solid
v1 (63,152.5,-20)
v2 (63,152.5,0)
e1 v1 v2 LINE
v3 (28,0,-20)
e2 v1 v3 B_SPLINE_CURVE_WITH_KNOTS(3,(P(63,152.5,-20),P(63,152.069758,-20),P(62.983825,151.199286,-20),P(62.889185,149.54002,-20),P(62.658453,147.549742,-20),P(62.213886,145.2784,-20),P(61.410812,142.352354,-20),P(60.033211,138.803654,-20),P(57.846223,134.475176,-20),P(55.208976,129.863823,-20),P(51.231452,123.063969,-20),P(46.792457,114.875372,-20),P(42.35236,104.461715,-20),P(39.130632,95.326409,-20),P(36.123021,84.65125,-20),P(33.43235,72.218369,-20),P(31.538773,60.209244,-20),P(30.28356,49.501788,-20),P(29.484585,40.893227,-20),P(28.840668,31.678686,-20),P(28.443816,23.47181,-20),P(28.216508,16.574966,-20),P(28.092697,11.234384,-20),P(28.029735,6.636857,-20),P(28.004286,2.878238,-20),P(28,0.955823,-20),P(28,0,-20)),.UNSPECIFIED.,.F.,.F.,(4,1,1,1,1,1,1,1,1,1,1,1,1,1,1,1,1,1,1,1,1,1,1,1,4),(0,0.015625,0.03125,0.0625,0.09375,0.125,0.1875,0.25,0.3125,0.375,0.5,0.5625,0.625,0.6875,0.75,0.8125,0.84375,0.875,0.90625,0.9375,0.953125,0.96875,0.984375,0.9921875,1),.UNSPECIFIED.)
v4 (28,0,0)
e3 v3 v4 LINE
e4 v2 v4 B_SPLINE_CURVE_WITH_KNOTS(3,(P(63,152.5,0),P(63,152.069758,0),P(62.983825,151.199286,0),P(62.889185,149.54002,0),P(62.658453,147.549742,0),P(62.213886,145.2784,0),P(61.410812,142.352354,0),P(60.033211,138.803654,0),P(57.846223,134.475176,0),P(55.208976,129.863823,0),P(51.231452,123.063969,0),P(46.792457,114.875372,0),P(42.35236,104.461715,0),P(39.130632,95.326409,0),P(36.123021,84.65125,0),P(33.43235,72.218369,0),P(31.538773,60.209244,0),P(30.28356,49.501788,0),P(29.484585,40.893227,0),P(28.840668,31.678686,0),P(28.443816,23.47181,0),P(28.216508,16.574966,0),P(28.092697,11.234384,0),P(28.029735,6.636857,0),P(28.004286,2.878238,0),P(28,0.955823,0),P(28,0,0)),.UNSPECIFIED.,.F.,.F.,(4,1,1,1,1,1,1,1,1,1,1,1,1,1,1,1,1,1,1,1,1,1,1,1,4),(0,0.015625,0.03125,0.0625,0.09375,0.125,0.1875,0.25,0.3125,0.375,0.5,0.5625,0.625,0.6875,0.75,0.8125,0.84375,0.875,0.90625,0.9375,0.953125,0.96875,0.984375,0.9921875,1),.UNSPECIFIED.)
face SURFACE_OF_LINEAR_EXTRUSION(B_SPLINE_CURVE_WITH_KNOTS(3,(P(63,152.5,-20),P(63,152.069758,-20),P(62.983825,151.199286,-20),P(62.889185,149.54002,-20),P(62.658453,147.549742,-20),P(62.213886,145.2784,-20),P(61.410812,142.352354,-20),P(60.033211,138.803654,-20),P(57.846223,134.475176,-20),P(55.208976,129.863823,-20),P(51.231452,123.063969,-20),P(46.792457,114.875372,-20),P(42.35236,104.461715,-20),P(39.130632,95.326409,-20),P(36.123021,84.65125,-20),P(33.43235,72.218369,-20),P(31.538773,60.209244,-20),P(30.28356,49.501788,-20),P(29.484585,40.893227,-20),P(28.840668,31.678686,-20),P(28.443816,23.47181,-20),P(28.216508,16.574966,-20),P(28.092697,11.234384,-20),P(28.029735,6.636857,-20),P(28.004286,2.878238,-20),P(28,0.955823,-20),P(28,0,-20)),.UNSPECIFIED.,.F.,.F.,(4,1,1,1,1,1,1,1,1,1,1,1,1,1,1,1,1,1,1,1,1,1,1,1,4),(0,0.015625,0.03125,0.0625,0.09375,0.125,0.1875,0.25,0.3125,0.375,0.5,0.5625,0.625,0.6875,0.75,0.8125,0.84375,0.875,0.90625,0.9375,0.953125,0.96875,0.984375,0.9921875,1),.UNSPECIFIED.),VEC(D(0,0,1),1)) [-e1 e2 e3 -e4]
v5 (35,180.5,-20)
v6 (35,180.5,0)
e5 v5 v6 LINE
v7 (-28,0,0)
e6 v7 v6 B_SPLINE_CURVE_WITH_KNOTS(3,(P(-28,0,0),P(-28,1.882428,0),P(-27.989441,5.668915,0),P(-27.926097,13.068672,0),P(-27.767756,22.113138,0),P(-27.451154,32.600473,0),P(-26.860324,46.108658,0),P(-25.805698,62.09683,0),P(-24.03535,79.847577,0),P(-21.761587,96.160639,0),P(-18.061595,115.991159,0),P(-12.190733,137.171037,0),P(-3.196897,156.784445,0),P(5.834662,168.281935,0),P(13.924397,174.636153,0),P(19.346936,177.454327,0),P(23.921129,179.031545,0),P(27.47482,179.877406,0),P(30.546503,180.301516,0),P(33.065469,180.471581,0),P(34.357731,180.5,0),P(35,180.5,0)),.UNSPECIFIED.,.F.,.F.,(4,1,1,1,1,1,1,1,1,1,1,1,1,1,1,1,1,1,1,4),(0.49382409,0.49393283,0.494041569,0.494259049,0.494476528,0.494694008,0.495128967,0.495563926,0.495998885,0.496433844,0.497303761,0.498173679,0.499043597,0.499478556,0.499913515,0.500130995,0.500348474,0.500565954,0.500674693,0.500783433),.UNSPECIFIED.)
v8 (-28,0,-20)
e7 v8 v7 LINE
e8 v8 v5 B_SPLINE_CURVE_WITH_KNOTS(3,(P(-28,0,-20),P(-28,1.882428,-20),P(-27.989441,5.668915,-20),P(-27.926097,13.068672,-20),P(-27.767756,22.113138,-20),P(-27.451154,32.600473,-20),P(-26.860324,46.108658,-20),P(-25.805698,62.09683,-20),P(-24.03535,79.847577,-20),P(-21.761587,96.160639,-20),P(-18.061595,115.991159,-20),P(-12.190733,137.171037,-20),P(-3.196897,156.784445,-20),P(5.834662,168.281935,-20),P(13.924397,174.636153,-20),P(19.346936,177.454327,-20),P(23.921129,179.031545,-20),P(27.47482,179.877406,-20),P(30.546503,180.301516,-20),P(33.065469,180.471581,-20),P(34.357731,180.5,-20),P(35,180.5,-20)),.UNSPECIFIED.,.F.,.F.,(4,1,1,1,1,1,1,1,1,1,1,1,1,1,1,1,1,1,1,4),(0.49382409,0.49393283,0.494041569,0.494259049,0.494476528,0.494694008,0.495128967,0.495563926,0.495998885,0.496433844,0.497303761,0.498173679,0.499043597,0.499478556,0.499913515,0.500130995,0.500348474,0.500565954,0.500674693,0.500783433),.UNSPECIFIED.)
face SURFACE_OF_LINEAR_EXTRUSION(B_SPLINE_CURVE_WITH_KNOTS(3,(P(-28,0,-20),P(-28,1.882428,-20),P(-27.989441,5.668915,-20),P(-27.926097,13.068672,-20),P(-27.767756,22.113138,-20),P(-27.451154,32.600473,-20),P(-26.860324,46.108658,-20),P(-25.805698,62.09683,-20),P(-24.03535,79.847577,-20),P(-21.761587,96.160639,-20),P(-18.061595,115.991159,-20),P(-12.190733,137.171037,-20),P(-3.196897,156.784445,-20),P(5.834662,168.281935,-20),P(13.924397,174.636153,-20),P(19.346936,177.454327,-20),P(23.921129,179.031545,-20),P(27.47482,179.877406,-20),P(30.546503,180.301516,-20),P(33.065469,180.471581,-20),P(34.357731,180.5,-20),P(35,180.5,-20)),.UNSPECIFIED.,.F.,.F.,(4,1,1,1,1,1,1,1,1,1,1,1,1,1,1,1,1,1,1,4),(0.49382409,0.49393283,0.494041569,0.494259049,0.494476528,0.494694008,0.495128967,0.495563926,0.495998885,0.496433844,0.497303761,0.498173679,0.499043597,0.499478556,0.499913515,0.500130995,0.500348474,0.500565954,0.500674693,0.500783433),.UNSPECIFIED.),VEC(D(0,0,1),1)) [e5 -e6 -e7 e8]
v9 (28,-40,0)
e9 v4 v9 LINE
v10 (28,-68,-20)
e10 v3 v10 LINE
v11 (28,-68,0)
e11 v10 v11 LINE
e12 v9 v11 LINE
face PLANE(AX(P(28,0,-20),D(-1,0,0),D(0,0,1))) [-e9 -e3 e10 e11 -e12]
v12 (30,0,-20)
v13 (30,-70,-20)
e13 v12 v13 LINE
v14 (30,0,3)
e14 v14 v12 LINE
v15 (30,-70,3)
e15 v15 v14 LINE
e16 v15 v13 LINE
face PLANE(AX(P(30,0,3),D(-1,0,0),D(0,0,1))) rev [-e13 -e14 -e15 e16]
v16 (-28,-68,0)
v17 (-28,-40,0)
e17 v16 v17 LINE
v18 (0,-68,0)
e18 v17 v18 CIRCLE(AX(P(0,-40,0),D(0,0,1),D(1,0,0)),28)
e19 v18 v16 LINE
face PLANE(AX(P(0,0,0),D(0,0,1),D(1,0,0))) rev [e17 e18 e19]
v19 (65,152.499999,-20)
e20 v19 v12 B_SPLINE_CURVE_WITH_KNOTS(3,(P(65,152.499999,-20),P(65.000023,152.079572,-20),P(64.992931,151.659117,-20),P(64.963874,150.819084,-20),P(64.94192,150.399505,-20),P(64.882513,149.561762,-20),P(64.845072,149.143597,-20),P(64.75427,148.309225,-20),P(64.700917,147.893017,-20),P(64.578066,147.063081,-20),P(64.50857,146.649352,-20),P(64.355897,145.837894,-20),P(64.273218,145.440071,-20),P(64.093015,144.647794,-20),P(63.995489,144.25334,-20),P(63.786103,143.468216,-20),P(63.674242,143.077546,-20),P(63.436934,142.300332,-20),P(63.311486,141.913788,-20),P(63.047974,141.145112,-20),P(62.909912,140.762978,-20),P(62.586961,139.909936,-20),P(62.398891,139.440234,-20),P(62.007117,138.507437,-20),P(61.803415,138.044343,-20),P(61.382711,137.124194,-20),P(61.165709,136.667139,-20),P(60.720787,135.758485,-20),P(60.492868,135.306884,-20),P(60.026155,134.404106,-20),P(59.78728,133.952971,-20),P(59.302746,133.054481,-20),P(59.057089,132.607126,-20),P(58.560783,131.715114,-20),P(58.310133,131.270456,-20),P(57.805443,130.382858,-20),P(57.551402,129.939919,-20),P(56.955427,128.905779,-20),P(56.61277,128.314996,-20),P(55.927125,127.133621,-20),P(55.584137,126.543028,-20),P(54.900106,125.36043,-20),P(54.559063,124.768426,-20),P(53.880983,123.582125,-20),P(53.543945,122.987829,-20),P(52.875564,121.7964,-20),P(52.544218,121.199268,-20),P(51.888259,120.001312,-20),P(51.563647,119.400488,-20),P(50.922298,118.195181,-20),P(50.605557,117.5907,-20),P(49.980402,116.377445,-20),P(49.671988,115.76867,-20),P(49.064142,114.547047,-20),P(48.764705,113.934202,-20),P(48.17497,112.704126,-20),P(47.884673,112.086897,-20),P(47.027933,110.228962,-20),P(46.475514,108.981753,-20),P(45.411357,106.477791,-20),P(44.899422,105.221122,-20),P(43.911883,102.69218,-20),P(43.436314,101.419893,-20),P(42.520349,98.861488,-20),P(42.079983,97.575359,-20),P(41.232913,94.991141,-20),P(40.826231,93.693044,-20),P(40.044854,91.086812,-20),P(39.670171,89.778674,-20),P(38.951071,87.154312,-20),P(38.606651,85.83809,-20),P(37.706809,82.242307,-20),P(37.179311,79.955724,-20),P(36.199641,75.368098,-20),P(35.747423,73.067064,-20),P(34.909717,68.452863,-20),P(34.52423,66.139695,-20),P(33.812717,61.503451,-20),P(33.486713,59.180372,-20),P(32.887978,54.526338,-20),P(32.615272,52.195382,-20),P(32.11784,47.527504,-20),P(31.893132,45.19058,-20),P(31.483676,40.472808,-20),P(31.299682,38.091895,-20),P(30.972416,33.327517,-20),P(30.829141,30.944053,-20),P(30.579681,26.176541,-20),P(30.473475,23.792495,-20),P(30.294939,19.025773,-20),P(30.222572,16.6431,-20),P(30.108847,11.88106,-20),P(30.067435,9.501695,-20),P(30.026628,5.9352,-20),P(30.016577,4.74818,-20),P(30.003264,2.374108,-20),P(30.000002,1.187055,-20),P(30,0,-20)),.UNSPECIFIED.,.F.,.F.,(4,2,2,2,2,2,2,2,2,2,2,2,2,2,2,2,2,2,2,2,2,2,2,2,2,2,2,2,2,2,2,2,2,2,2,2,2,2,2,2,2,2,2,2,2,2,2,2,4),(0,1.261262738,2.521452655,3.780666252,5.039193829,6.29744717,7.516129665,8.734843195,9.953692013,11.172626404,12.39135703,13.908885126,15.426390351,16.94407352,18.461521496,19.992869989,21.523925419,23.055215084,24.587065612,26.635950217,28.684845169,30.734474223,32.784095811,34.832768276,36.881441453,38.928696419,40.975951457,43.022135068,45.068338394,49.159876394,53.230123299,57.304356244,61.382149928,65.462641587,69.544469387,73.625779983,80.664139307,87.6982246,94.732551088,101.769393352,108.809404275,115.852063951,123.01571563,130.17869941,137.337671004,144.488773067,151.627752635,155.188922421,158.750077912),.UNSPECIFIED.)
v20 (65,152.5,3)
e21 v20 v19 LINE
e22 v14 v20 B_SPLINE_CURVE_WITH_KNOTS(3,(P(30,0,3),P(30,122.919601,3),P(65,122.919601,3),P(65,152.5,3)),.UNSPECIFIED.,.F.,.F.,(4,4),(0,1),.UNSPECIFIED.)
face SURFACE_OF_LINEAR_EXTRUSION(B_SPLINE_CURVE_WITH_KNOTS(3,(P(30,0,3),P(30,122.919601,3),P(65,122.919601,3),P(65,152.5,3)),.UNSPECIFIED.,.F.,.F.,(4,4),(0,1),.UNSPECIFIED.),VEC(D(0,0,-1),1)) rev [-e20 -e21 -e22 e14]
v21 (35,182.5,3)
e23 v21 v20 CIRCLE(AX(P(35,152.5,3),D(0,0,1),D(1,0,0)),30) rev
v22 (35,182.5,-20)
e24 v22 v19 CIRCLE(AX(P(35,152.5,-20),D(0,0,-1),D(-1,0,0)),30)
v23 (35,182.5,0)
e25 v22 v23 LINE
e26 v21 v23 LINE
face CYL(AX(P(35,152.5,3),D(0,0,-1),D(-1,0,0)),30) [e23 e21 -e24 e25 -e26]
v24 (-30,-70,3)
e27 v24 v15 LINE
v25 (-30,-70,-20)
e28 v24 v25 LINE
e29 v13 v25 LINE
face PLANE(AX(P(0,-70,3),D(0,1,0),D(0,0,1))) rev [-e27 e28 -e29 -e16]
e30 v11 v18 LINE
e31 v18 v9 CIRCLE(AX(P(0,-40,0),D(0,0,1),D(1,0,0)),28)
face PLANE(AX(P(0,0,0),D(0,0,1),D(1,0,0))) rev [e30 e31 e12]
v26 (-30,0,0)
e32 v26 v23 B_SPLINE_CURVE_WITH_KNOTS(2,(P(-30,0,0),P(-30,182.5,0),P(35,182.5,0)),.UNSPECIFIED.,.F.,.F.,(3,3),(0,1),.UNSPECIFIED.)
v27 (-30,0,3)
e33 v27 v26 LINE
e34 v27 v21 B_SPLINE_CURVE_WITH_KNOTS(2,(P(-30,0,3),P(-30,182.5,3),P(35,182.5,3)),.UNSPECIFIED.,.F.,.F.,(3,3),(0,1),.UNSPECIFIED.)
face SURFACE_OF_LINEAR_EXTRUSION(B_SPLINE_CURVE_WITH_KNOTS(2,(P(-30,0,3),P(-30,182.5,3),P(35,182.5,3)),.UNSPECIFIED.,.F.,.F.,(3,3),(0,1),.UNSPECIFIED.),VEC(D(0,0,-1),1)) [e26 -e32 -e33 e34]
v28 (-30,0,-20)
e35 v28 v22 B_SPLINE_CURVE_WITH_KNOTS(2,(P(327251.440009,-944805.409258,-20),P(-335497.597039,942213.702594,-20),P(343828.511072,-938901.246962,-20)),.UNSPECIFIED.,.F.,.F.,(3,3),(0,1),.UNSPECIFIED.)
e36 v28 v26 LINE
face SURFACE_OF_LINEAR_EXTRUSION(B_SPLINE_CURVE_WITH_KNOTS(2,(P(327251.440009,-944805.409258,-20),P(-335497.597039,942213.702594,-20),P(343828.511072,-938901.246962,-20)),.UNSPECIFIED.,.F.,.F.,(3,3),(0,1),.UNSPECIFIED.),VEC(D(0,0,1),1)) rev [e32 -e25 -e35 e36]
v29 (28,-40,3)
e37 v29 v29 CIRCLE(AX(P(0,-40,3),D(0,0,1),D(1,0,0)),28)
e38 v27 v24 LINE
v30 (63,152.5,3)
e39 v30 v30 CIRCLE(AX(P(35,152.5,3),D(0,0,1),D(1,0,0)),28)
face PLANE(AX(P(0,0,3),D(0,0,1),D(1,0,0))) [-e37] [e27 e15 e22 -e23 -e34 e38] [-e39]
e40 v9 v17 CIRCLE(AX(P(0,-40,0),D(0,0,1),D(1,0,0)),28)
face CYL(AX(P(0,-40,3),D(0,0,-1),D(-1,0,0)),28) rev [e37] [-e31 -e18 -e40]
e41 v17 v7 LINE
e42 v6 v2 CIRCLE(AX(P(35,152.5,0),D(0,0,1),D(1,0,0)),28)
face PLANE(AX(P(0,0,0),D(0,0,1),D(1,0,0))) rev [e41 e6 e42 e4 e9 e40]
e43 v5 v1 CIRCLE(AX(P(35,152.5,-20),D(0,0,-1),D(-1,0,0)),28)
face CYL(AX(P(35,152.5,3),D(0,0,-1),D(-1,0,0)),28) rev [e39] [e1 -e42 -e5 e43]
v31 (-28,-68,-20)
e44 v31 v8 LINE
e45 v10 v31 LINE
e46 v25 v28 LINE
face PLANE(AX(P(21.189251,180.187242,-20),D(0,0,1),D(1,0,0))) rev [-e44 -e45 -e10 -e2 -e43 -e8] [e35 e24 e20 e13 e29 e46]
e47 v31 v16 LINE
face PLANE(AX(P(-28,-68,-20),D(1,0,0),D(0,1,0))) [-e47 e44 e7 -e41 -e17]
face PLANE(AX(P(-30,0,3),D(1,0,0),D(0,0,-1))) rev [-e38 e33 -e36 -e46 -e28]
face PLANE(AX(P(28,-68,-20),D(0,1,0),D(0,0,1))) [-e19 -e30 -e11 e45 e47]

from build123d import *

# Parameters (mm, degrees)
BOSS_EXTRUDE1_OUTLINE_R = 28
BOSS_EXTRUDE1_DEPTH     = 3
BOSS_EXTRUDE3_START     = 20
BOSS_EXTRUDE3_DEPTH     = 20


# Read off the part's stored shape, not the designer's step: Boss-Extrude1
with BuildPart() as part:
    # Boss-Extrude1 outline → Boss-Extrude1 (new body)
    with BuildSketch(Plane.XY):
        with BuildLine():
            Line((30, -70), (30, 0))
            add(Edge.make_bspline(
                [(30, 0), (30, 122.919601085), (65, 122.919601085), (65, 152.5)],
                knots=[0, 0, 0, 0, 1, 1, 1, 1], degree=3))
            ThreePointArc((65, 152.5), (56.213203436, 173.713203436), (35, 182.5))
            add(Edge.make_bspline(
                [(-30, 0), (-30, 182.5), (35, 182.5)],
                knots=[0, 0, 0, 1, 1, 1], degree=2))
            Line((-30, 0), (-30, -70))
            Line((-30, -70), (30, -70))
        make_face()
        with Locations((0, -40)):
            Circle(BOSS_EXTRUDE1_OUTLINE_R, mode=Mode.SUBTRACT)
        with Locations((35, 152.5)):
            Circle(BOSS_EXTRUDE1_OUTLINE_R, mode=Mode.SUBTRACT)
    extrude(amount=BOSS_EXTRUDE1_DEPTH)

    # Sketch3 → Boss-Extrude3 (add)
    with BuildSketch(Plane(origin=(0, 0, 0), x_dir=(-1, 0, 0), z_dir=(0, 0, -1)).offset(BOSS_EXTRUDE3_START)):
        with BuildLine():
            Line((-30, 0), (-30, -70))
            Line((-30, -70), (30, -70))
            Line((30, -70), (30, 0))
            add(Edge.make_bspline(
                [(30, 0), (30, 182.5), (-35, 182.5)],
                knots=[0, 0, 0, 1, 1, 1], degree=2))
            ThreePointArc((-35, 182.5), (-56.213203436, 173.713203436), (-65, 152.5))
            add(Edge.make_bspline(
                [(-65, 152.5), (-65, 122.919601085), (-30, 122.919601085), (-30, 0)],
                knots=[0, 0, 0, 0, 1, 1, 1, 1], degree=3))
        make_face()
        with BuildLine():
            Line((-28, 0), (-28, -68))
            Line((-28, -68), (28, -68))
            Line((28, -68), (28, 0))
            add(Edge.make_bspline(
                [(28, 0), (28, 1.882428306), (27.9894412, 5.668914661), (27.926096555, 13.06867177), (27.76775639, 22.113138456), (27.45115367, 32.600472774), (26.860323994, 46.108658024), (25.805698034, 62.096829622), (24.035349894, 79.847577378), (21.76158749, 96.16063855), (18.061595292, 115.991158762), (12.190733374, 137.171036702), (3.196896645, 156.784444582), (-5.834661566, 168.281935437), (-13.924397363, 174.636152769), (-19.34693601, 177.454327423), (-23.921129202, 179.03154511), (-27.474819646, 179.877405657), (-30.546503211, 180.301515997), (-33.065469046, 180.471580895), (-34.357731157, 180.5), (-35, 180.5)],
                knots=[0.49382409, 0.49382409, 0.49382409, 0.49382409, 0.49393283, 0.494041569, 0.494259049, 0.494476528, 0.494694008, 0.495128967, 0.495563926, 0.495998885, 0.496433844, 0.497303761, 0.498173679, 0.499043597, 0.499478556, 0.499913515, 0.500130995, 0.500348474, 0.500565954, 0.500674693, 0.500783433, 0.500783433, 0.500783433, 0.500783433], degree=3))
            ThreePointArc((-35, 180.5), (-54.798989873, 172.298989873), (-63, 152.5))
            add(Edge.make_bspline(
                [(-63, 152.5), (-63, 152.069757812), (-62.983825045, 151.199286285), (-62.88918488, 149.540019878), (-62.658452593, 147.549741818), (-62.213886299, 145.2784002), (-61.410812146, 142.352354087), (-60.033210568, 138.80365362), (-57.846222702, 134.475175879), (-55.208976195, 129.863823008), (-51.231452034, 123.063969133), (-46.792456906, 114.875371889), (-42.352360132, 104.461715313), (-39.130632465, 95.326409045), (-36.123020534, 84.651250359), (-33.432349584, 72.218369024), (-31.538773259, 60.209244421), (-30.283559802, 49.501788472), (-29.484585221, 40.893227078), (-28.840668199, 31.678686061), (-28.443815603, 23.471810433), (-28.216507678, 16.574966065), (-28.092697498, 11.23438398), (-28.029735078, 6.636857178), (-28.004285655, 2.878237886), (-28, 0.955822894), (-28, 0)],
                knots=[0, 0, 0, 0, 0.015625, 0.03125, 0.0625, 0.09375, 0.125, 0.1875, 0.25, 0.3125, 0.375, 0.5, 0.5625, 0.625, 0.6875, 0.75, 0.8125, 0.84375, 0.875, 0.90625, 0.9375, 0.953125, 0.96875, 0.984375, 0.9921875, 1, 1, 1, 1], degree=3))
        make_face(mode=Mode.SUBTRACT)
    extrude(amount=-BOSS_EXTRUDE3_DEPTH)


solid = part.part
